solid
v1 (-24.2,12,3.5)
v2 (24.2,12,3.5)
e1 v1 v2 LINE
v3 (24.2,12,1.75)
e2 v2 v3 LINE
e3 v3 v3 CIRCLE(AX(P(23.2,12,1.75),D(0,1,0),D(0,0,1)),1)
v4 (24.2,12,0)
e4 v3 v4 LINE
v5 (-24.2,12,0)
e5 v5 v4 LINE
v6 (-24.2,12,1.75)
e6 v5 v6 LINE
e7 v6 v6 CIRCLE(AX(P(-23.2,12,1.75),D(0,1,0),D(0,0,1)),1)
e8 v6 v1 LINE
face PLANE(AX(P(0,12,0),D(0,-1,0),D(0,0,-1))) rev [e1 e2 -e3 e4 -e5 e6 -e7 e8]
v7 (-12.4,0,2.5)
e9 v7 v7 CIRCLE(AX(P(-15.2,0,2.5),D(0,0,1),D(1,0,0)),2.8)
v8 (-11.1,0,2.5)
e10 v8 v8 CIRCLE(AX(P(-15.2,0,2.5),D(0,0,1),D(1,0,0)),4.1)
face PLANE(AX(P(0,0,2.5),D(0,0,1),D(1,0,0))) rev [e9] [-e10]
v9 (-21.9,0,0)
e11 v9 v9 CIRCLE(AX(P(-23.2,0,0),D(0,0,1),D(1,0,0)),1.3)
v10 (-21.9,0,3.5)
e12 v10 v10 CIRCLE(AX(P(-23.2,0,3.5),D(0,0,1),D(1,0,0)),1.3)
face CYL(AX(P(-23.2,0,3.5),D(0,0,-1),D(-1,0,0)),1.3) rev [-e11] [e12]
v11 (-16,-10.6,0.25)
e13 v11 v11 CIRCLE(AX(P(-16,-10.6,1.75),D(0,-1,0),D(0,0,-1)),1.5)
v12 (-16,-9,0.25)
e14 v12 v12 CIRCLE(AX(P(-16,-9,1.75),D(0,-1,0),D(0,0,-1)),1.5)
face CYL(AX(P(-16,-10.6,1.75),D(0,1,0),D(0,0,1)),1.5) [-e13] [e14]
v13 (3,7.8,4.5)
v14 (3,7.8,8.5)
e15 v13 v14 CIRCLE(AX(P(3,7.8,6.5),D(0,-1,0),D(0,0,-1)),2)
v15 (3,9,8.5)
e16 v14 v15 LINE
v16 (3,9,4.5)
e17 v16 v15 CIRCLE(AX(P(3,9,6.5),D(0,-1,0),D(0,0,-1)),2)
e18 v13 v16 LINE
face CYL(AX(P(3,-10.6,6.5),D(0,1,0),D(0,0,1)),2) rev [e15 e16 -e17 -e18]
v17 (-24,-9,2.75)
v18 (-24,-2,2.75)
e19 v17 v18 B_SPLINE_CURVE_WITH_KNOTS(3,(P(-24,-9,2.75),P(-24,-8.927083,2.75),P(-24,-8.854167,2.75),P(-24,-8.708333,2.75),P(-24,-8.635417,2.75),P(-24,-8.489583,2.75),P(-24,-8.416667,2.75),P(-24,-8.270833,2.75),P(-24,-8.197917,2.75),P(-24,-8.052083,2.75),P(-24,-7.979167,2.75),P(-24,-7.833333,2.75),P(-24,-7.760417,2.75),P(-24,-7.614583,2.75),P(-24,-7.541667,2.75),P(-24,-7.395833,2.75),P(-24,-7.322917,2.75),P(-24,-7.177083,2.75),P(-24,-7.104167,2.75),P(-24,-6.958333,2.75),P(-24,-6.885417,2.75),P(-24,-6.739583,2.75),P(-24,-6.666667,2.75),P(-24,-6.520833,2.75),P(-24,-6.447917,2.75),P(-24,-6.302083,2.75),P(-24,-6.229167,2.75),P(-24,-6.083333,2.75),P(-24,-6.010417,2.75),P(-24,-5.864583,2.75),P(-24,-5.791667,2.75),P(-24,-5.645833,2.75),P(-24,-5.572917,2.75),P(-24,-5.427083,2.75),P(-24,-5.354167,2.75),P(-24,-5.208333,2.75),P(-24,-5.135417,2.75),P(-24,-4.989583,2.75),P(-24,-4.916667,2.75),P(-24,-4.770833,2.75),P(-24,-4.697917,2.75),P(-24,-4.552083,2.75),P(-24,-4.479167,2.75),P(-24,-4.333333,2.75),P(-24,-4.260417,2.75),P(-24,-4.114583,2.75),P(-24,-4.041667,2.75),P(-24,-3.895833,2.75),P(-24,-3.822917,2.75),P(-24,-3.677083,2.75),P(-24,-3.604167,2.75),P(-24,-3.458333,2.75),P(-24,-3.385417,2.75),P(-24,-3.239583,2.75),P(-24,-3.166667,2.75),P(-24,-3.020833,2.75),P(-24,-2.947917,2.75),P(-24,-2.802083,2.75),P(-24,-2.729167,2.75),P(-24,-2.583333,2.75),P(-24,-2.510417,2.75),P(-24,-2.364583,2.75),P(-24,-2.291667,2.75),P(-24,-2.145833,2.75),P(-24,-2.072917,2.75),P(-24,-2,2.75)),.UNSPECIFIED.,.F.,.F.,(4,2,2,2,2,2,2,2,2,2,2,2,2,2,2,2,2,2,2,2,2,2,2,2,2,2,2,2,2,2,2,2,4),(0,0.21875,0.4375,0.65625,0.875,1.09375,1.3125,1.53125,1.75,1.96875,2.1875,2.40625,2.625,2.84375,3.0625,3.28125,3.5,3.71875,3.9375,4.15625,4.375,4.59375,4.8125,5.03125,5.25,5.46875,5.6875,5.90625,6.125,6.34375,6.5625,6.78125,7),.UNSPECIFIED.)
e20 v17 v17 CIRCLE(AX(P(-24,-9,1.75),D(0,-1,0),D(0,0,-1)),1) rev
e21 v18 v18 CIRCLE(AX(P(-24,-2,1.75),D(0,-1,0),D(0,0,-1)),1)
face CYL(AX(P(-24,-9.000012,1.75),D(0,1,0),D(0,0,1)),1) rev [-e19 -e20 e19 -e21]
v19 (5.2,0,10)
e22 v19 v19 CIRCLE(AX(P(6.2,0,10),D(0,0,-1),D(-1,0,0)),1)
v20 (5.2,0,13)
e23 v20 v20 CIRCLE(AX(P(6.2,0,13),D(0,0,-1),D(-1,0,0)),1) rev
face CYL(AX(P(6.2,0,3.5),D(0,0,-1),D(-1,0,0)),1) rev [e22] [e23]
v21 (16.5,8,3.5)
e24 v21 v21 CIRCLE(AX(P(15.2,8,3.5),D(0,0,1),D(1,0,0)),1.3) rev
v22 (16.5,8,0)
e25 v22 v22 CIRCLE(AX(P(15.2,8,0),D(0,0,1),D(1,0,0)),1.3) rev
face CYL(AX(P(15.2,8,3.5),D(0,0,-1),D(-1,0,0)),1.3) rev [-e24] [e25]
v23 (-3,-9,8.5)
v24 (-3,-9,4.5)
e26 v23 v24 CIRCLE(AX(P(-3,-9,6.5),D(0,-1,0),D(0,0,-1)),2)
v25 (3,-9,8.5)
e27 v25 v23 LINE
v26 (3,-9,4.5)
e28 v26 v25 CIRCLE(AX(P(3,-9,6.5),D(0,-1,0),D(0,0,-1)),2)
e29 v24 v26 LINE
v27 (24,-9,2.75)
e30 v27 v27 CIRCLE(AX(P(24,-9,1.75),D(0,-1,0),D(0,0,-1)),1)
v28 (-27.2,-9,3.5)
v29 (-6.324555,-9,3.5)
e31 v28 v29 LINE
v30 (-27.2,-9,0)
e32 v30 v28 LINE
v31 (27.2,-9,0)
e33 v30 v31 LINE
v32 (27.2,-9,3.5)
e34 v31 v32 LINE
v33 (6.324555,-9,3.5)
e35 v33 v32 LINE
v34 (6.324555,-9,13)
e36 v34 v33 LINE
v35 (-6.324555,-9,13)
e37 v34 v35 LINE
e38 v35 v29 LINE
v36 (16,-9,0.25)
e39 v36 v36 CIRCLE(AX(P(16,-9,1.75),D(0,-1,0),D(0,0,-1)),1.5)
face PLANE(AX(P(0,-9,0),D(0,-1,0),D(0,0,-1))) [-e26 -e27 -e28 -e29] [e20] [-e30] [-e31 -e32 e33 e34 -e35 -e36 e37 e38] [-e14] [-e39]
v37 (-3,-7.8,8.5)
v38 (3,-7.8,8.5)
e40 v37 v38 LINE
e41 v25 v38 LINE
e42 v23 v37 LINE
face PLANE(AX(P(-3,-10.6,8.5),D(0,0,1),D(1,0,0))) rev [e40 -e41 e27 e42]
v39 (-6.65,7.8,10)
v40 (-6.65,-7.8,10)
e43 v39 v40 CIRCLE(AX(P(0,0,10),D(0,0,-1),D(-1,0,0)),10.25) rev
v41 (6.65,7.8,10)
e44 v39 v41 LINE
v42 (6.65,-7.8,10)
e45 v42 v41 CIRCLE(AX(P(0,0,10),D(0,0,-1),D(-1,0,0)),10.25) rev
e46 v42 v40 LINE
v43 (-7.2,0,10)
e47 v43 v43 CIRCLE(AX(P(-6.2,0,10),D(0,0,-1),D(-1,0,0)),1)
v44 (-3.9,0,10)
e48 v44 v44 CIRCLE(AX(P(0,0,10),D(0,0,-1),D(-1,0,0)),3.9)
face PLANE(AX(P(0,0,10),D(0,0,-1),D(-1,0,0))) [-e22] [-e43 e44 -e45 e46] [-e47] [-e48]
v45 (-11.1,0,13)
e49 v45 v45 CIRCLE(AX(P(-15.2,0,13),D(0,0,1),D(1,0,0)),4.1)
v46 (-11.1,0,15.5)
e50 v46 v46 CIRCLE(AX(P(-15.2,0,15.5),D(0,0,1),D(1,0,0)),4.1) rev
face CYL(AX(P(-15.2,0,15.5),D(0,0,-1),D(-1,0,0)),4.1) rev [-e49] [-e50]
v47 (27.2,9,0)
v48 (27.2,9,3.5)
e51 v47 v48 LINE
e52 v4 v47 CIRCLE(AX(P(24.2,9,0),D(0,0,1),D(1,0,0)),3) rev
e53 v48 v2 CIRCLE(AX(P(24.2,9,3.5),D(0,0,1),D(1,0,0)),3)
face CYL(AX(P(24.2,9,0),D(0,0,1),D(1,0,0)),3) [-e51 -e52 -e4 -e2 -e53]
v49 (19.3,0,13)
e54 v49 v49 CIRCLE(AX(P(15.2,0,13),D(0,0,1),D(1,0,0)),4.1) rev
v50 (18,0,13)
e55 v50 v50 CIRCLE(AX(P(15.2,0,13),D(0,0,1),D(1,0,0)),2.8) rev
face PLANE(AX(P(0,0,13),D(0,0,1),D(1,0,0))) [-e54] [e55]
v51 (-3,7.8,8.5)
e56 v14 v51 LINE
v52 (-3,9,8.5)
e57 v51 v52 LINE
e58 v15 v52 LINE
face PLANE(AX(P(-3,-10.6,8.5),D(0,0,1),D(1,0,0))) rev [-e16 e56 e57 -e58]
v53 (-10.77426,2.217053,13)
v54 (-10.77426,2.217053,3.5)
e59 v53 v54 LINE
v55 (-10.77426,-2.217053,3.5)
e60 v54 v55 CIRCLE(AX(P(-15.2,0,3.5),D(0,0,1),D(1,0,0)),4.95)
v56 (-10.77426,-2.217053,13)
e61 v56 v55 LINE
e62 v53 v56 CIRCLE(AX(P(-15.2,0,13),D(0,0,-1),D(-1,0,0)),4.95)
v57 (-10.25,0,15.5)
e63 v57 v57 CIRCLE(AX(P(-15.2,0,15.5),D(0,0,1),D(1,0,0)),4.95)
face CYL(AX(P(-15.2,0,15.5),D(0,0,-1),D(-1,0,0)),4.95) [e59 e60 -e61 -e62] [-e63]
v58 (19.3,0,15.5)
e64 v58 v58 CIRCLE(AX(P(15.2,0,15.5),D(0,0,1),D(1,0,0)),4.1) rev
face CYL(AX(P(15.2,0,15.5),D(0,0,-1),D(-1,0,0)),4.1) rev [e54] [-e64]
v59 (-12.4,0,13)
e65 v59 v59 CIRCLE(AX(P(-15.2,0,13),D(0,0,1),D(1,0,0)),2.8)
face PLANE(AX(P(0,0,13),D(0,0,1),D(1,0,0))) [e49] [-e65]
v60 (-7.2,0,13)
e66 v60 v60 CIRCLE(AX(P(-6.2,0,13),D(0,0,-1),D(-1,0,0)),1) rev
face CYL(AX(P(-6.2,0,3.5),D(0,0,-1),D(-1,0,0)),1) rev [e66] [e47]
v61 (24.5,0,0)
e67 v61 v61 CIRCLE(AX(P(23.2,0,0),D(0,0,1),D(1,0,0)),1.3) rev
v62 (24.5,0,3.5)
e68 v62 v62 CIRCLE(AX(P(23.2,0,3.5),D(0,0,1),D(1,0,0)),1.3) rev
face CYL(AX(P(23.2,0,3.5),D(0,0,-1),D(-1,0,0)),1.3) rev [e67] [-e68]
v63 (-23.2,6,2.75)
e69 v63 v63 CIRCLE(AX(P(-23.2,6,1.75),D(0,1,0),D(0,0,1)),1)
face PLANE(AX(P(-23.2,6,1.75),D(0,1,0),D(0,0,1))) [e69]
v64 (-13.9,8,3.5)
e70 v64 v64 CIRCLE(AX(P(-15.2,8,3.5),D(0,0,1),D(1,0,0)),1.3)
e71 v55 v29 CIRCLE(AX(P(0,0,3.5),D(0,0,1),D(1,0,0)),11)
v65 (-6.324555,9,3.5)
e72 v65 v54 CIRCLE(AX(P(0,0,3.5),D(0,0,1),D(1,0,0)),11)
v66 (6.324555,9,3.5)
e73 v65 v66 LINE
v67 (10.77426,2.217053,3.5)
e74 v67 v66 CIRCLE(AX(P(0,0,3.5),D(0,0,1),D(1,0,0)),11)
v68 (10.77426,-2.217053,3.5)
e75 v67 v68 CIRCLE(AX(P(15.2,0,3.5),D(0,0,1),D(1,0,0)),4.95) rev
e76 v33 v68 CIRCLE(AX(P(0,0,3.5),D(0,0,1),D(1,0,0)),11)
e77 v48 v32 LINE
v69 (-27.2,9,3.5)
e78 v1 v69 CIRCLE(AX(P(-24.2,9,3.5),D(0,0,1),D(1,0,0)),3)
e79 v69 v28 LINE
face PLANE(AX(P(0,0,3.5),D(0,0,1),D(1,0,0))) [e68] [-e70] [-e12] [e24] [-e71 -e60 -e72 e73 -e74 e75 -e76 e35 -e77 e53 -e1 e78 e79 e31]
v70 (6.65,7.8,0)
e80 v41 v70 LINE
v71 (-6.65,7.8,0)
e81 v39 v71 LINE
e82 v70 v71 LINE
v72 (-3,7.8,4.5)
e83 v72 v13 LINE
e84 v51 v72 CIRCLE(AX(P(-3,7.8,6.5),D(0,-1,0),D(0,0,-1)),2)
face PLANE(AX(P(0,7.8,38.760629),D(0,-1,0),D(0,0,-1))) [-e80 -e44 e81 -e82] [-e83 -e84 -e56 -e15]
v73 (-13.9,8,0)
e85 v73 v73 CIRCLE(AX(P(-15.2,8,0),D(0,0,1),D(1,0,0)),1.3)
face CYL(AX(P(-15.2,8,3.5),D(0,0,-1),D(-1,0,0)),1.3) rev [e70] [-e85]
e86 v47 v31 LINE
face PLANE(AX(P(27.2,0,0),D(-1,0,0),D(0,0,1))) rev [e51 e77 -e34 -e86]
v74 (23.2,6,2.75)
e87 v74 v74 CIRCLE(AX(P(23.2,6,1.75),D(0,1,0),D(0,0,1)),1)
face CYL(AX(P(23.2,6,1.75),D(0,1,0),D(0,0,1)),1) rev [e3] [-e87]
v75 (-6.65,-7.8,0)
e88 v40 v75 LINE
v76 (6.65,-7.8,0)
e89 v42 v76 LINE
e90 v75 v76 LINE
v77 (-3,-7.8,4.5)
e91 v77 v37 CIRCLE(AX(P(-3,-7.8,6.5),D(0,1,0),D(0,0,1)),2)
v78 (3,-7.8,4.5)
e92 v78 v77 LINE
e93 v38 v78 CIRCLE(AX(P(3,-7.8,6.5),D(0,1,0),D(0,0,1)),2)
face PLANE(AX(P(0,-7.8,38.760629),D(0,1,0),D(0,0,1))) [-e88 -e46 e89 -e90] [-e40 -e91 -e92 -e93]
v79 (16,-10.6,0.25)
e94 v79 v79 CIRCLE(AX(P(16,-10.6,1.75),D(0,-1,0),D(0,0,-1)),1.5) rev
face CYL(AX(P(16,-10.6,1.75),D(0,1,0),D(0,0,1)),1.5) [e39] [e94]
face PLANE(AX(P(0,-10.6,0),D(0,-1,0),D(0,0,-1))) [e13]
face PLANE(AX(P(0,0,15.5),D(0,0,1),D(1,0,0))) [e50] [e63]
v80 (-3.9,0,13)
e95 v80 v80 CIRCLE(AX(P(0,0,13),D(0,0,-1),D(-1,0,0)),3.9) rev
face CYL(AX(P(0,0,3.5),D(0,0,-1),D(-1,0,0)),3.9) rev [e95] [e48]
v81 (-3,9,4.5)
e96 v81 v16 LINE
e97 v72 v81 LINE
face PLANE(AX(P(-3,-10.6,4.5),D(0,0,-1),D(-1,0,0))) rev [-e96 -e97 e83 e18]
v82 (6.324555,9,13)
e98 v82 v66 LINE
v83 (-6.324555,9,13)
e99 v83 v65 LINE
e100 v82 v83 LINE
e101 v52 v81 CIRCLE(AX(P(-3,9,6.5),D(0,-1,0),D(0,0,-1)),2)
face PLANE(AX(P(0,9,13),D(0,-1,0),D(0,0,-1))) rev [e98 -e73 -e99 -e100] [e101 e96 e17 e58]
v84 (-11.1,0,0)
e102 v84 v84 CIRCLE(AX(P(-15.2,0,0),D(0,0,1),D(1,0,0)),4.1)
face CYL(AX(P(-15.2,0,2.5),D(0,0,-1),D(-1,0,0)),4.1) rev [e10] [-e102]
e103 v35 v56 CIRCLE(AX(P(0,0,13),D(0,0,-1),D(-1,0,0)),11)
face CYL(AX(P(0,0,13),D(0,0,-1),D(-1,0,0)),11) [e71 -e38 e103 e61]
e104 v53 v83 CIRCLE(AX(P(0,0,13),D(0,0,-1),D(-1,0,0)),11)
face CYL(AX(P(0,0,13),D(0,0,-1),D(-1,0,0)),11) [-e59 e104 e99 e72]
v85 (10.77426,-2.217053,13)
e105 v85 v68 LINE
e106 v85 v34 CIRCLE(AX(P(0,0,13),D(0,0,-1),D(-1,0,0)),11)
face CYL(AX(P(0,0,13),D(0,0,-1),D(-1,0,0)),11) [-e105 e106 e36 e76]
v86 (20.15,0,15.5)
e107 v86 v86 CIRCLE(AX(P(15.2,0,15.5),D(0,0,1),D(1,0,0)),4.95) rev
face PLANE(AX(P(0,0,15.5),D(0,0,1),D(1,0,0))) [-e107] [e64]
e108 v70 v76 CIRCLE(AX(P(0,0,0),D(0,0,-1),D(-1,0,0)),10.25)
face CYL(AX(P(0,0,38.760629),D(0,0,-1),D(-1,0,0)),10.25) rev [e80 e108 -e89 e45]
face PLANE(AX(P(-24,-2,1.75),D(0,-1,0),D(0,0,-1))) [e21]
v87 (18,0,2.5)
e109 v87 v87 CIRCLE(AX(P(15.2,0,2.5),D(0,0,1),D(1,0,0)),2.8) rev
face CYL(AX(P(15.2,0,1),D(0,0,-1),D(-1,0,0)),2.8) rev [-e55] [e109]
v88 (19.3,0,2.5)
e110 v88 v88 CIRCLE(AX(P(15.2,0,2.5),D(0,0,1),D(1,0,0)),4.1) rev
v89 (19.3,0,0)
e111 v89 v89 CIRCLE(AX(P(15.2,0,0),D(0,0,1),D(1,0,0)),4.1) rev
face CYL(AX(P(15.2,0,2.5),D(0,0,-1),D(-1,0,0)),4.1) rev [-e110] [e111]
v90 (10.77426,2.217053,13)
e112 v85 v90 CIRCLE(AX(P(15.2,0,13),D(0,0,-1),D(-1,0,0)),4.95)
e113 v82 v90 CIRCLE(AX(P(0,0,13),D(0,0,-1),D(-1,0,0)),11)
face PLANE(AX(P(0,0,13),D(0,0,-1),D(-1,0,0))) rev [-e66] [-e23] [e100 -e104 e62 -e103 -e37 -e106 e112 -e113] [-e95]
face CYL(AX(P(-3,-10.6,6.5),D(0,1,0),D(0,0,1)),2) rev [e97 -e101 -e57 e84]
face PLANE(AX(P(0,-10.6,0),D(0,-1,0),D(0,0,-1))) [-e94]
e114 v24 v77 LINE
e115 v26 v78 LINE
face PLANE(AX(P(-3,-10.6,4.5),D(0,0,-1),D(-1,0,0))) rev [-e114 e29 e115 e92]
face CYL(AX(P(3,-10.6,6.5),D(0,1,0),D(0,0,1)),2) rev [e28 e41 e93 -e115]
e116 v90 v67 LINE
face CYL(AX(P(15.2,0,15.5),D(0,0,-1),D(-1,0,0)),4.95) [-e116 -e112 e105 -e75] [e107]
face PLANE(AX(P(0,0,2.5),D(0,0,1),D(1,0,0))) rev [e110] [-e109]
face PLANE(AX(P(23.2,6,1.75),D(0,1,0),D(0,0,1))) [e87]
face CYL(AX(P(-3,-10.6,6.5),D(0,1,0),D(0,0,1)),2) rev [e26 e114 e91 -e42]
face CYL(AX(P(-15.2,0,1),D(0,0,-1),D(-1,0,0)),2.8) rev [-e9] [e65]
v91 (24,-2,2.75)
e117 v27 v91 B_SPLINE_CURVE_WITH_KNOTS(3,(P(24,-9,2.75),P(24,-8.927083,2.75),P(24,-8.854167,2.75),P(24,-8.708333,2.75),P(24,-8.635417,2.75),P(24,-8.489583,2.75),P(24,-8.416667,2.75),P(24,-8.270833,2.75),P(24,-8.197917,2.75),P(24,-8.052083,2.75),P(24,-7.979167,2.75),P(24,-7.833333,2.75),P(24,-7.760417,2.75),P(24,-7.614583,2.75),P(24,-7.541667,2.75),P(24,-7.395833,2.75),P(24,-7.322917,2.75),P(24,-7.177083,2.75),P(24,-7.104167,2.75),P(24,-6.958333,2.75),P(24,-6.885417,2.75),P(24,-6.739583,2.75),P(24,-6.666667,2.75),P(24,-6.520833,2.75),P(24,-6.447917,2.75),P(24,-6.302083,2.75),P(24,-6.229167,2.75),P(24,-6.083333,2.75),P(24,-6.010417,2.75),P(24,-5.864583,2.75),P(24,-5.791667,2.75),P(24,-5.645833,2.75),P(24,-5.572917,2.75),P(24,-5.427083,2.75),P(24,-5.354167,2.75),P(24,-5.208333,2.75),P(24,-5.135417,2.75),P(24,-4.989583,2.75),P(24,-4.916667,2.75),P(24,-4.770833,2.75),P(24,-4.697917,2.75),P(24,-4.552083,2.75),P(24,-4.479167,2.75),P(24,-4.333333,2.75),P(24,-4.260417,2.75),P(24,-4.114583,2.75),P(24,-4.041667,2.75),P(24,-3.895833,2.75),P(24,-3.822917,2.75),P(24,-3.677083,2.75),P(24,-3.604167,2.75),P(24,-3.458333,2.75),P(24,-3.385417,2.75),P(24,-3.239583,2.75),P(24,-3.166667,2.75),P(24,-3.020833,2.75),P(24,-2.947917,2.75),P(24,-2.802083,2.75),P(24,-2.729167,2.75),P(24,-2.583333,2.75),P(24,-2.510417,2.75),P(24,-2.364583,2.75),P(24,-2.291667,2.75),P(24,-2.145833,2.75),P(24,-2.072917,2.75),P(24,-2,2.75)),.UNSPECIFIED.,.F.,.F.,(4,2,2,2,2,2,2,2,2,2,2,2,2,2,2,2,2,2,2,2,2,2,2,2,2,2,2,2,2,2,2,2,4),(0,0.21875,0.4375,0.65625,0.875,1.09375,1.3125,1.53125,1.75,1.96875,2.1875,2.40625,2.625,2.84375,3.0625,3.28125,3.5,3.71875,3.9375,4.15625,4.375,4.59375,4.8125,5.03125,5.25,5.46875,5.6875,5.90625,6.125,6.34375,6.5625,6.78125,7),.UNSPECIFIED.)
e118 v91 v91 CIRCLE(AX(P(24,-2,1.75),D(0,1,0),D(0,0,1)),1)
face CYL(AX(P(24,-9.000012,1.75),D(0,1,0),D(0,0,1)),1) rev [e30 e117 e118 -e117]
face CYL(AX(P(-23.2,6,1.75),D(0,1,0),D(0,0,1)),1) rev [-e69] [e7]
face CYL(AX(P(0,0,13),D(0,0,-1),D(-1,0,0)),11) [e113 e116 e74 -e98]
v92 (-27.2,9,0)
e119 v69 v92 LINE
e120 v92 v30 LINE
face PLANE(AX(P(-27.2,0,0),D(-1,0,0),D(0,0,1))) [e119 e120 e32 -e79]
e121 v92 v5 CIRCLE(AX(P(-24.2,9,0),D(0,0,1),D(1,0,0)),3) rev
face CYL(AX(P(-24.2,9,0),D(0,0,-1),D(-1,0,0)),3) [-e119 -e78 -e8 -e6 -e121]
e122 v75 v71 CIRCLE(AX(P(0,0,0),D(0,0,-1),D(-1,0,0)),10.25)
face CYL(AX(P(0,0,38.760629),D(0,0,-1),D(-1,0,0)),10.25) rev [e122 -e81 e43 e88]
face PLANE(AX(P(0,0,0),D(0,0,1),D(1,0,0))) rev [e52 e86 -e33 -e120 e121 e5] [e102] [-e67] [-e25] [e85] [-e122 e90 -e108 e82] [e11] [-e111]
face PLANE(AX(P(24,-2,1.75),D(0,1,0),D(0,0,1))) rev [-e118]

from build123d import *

# Parameters (mm, degrees)
SKETCH_2_R               = 3.9
SKETCH_2_R_2             = 4.1
SKETCH_2_R_3             = 1
SKETCH_2_R_4             = 1.3
EXTRUDE_1_DEPTH          = 3.5
SKETCH_2_4_R             = 4.1
SKETCH_2_4_R_2           = 2.8
EXTRUDE_2_DEPTH          = 1
CUT_EXTRUDE_1_DEPTH      = 41.636067723
CUT_EXTRUDE_1_DEPTH_BACK = 41.636067723
SKETCH_3_W               = 54.4
SKETCH_3_H               = 21
FILLET_1_R               = 3
CUT_EXTRUDE_2_DEPTH      = 35.541134897
CUT_EXTRUDE_2_DEPTH_BACK = 7
SKETCH_4_R               = 1
SKETCH_4_4_R             = 1.5
EXTRUDE_3_DEPTH          = 1.6
SKETCH_5_R               = 1
SKETCH_5_R_2             = 3.9
EXTRUDE_4_DEPTH          = 13
SKETCH_6_R               = 1
SKETCH_6_R_2             = 3.9
CUT_EXTRUDE_3_DEPTH      = 10
CUT_EXTRUDE_4_DEPTH      = 36.958309193
CUT_EXTRUDE_4_DEPTH_BACK = 36.958309193
SKETCH_2_5_R             = 4.1
SKETCH_2_5_R_2           = 2.8
EXTRUDE_5_DEPTH          = 13
SKETCH_8_R               = 4.1
EXTRUDE_6_DEPTH          = 12
EXTRUDE_START            = 9.5
EXTRUDE_7_DEPTH          = 2.5
SKETCH_2_6_R             = 4.1
SKETCH_2_6_R_2           = 2.8
CUT_EXTRUDE_10_DEPTH     = 2.5
SKETCH_9_R               = 1
CUT_EXTRUDE_11_DEPTH     = 6


# Read off the part's stored shape, not the designer's step: 凸台-拉伸7
with BuildPart() as part:
    # 草图2 → 凸台-拉伸1 (new body)
    with BuildSketch(Plane.XY):
        with BuildLine():
            Line((15.2, -20), (-15.2, -20))
            ThreePointArc((-15.2, -20), (-35.2, 0), (-15.2, 20))
            Line((-15.2, 20), (15.2, 20))
            ThreePointArc((15.2, 20), (35.2, 0), (15.2, -20))
        make_face()
        Circle(SKETCH_2_R, mode=Mode.SUBTRACT)
        with Locations((-15.2, 0)):
            Circle(SKETCH_2_R_2, mode=Mode.SUBTRACT)
        with Locations((15.2, 0)):
            Circle(SKETCH_2_R_2, mode=Mode.SUBTRACT)
        with Locations((-6.2, 0)):
            Circle(SKETCH_2_R_3, mode=Mode.SUBTRACT)
        with Locations((6.2, 0)):
            Circle(SKETCH_2_R_3, mode=Mode.SUBTRACT)
        with Locations((-15.2, 8)):
            Circle(SKETCH_2_R_4, mode=Mode.SUBTRACT)
        with Locations((-23.2, 0)):
            Circle(SKETCH_2_R_4, mode=Mode.SUBTRACT)
        with Locations((23.2, 0)):
            Circle(SKETCH_2_R_4, mode=Mode.SUBTRACT)
        with Locations((15.2, 8)):
            Circle(SKETCH_2_R_4, mode=Mode.SUBTRACT)
    extrude(amount=EXTRUDE_1_DEPTH)

    # 草图2<4> → 凸台-拉伸2 (add)
    # profile 1 of 2: a face of its own
    with BuildSketch(Plane.XY):
        with Locations((-15.2, 0)):
            Circle(SKETCH_2_4_R)
        with Locations((-15.2, 0)):
            Circle(SKETCH_2_4_R_2, mode=Mode.SUBTRACT)
    # profile 2 of 2: a face of its own
    with BuildSketch(Plane.XY):
        with Locations((15.2, 0)):
            Circle(SKETCH_2_4_R)
        with Locations((15.2, 0)):
            Circle(SKETCH_2_4_R_2, mode=Mode.SUBTRACT)
    extrude(amount=EXTRUDE_2_DEPTH)

    # 草图3 → 切除-拉伸1 (cut, two sides: drawn at the far end of the back side and taken through both)
    with BuildSketch(Plane.XY.offset(3.5).offset(-CUT_EXTRUDE_1_DEPTH_BACK)):
        with BuildLine():
            Line((15.2, -20), (-15.2, -20))
            ThreePointArc((-15.2, -20), (-35.2, 0), (-15.2, 20))
            Line((-15.2, 20), (15.2, 20))
            ThreePointArc((15.2, 20), (35.2, 0), (15.2, -20))
        make_face()
        with Locations((0, 1.5)):
            Rectangle(SKETCH_3_W, SKETCH_3_H, mode=Mode.SUBTRACT)
    extrude(amount=CUT_EXTRUDE_1_DEPTH + CUT_EXTRUDE_1_DEPTH_BACK, mode=Mode.SUBTRACT)

    # 圆角1
    fillet_1_edges = [part.edges().sort_by_distance(p)[0] for p in [
        (27.2, 12, 1.75),
        (-27.2, 12, 1.75),
    ]]
    fillet(fillet_1_edges, radius=FILLET_1_R)

    # 草图4 → 切除-拉伸2 (cut, two sides: drawn at the far end of the back side and taken through both)
    with BuildSketch(Plane.XZ.offset(9).offset(-CUT_EXTRUDE_2_DEPTH_BACK)):
        with Locations(Location((-24, 1.75, 0), (0, 0, 90))):
            Circle(SKETCH_4_R)
        with Locations(Location((24, 1.75, 0), (0, 0, 90))):
            Circle(SKETCH_4_R)
    extrude(amount=CUT_EXTRUDE_2_DEPTH + CUT_EXTRUDE_2_DEPTH_BACK, mode=Mode.SUBTRACT)

    # 草图4<4> → 凸台-拉伸3 (add)
    with BuildSketch(Plane.XZ.offset(9)):
        with Locations(Location((-16, 1.75, 0), (0, 0, 270))):
            Circle(SKETCH_4_4_R)
        with Locations(Location((16, 1.75, 0), (0, 0, 270))):
            Circle(SKETCH_4_4_R)
    extrude(amount=EXTRUDE_3_DEPTH)

    # 草图5 → 凸台-拉伸4 (add)
    with BuildSketch(Plane(origin=(0, 0, 0), x_dir=(-1, 0, 0), z_dir=(0, 0, -1))):
        with BuildLine():
            Line((6.32455532, 9), (-6.32455532, 9))
            ThreePointArc((-6.32455532, 9), (-11, 0), (-6.32455532, -9))
            Line((-6.32455532, -9), (6.32455532, -9))
            ThreePointArc((6.32455532, -9), (9.761406367, -5.070990607), (11, 0))
            ThreePointArc((11, 0), (9.761406367, 5.070990607), (6.32455532, 9))
        make_face()
        with Locations((-6.2, 0)):
            Circle(SKETCH_5_R, mode=Mode.SUBTRACT)
        Circle(SKETCH_5_R_2, mode=Mode.SUBTRACT)
        with Locations((6.2, 0)):
            Circle(SKETCH_5_R, mode=Mode.SUBTRACT)
    extrude(amount=-EXTRUDE_4_DEPTH)

    # 草图6 → 切除-拉伸3 (cut)
    with BuildSketch(Plane(origin=(0, 0, 0), x_dir=(-1, 0, 0), z_dir=(0, 0, -1))):
        with BuildLine():
            Line((6.65, 7.8), (-6.65, 7.8))
            ThreePointArc((-6.65, 7.8), (-10.25, 0), (-6.65, -7.8))
            Line((-6.65, -7.8), (6.65, -7.8))
            ThreePointArc((6.65, -7.8), (9.306583691, -4.295346319), (10.25, 0))
            ThreePointArc((10.25, 0), (9.306583691, 4.295346319), (6.65, 7.8))
        make_face()
        with Locations((-6.2, 0)):
            Circle(SKETCH_6_R, mode=Mode.SUBTRACT)
        Circle(SKETCH_6_R_2, mode=Mode.SUBTRACT)
        with Locations((6.2, 0)):
            Circle(SKETCH_6_R, mode=Mode.SUBTRACT)
    extrude(amount=-CUT_EXTRUDE_3_DEPTH, mode=Mode.SUBTRACT)

    # 草图7 → 切除-拉伸4 (cut, two sides: drawn at the far end of the back side and taken through both)
    with BuildSketch(Plane(origin=(0, 9, 0), x_dir=(1, 0, 0), z_dir=(0, 1, 0)).offset(-CUT_EXTRUDE_4_DEPTH_BACK)):
        with BuildLine():
            Line((-3, -4.5), (3, -4.5))
            ThreePointArc((3, -4.5), (5, -6.5), (3, -8.5))
            Line((3, -8.5), (-3, -8.5))
            ThreePointArc((-3, -8.5), (-5, -6.5), (-3, -4.5))
        make_face()
    extrude(amount=CUT_EXTRUDE_4_DEPTH + CUT_EXTRUDE_4_DEPTH_BACK, mode=Mode.SUBTRACT)

    # 草图2<5> → 凸台-拉伸5 (add)
    # profile 1 of 2: a face of its own
    with BuildSketch(Plane.XY):
        with Locations(Location((-15.2, 0, 0), (0, 0, 180))):
            Circle(SKETCH_2_5_R)
        with Locations((-15.2, 0)):
            Circle(SKETCH_2_5_R_2, mode=Mode.SUBTRACT)
    # profile 2 of 2: a face of its own
    with BuildSketch(Plane.XY):
        with Locations(Location((15.2, 0, 0), (0, 0, 180))):
            Circle(SKETCH_2_5_R)
        with Locations((15.2, 0)):
            Circle(SKETCH_2_5_R_2, mode=Mode.SUBTRACT)
    extrude(amount=EXTRUDE_5_DEPTH)

    # 草图8 → 凸台-拉伸6 (add)
    # profile 1 of 2: a face of its own
    with BuildSketch(Plane.XY.offset(3.5)):
        with BuildLine():
            ThreePointArc((-10.774259868, -2.217053064), (-11, 0), (-10.774259868, 2.217053064))
            ThreePointArc((-10.774259868, 2.217053064), (-20.15, 0), (-10.774259868, -2.217053064))
        make_face()
        with Locations((-15.2, 0)):
            Circle(SKETCH_8_R, mode=Mode.SUBTRACT)
    # profile 2 of 2: a face of its own
    with BuildSketch(Plane.XY.offset(3.5)):
        with BuildLine():
            ThreePointArc((10.774259868, -2.217053064), (16.339097526, -4.817152356), (20.15, 0))
            ThreePointArc((20.15, 0), (16.339097526, 4.817152356), (10.774259868, 2.217053064))
            ThreePointArc((10.774259868, 2.217053064), (11, 0), (10.774259868, -2.217053064))
        make_face()
        with Locations((15.2, 0)):
            Circle(SKETCH_8_R, mode=Mode.SUBTRACT)
    extrude(amount=EXTRUDE_6_DEPTH)

    # 凸台-拉伸7 outline → 凸台-拉伸7 (add)
    with BuildSketch(Plane.XY.offset(3.5).offset(EXTRUDE_START)):
        with BuildLine():
            ThreePointArc((-10.774259868, -2.217053064), (-10.25, 0), (-10.774259868, 2.217053064))
            ThreePointArc((-10.774259868, 2.217053064), (-11, 0), (-10.774259868, -2.217053064))
        make_face()
        with BuildLine():
            ThreePointArc((10.774259868, -2.217053064), (11, 0), (10.774259868, 2.217053064))
            ThreePointArc((10.774259868, 2.217053064), (10.25, 0), (10.774259868, -2.217053064))
        make_face()
    extrude(amount=EXTRUDE_7_DEPTH)

    # 草图2<6> → 切除-拉伸10 (cut)
    # profile 1 of 2: a face of its own
    with BuildSketch(Plane.XY):
        with Locations((-15.2, 0)):
            Circle(SKETCH_2_6_R)
        with Locations((-15.2, 0)):
            Circle(SKETCH_2_6_R_2, mode=Mode.SUBTRACT)
    # profile 2 of 2: a face of its own
    with BuildSketch(Plane.XY):
        with Locations((15.2, 0)):
            Circle(SKETCH_2_6_R)
        with Locations((15.2, 0)):
            Circle(SKETCH_2_6_R_2, mode=Mode.SUBTRACT)
    extrude(amount=CUT_EXTRUDE_10_DEPTH, mode=Mode.SUBTRACT)

    # 草图9 → 切除-拉伸11 (cut)
    with BuildSketch(Plane(origin=(0, 12, 0), x_dir=(1, 0, 0), z_dir=(0, 1, 0))):
        with Locations(Location((-23.2, -1.75, 0), (0, 0, 270))):
            Circle(SKETCH_9_R)
        with Locations(Location((23.2, -1.75, 0), (0, 0, 270))):
            Circle(SKETCH_9_R)
    extrude(amount=-CUT_EXTRUDE_11_DEPTH, mode=Mode.SUBTRACT)


solid = part.part
